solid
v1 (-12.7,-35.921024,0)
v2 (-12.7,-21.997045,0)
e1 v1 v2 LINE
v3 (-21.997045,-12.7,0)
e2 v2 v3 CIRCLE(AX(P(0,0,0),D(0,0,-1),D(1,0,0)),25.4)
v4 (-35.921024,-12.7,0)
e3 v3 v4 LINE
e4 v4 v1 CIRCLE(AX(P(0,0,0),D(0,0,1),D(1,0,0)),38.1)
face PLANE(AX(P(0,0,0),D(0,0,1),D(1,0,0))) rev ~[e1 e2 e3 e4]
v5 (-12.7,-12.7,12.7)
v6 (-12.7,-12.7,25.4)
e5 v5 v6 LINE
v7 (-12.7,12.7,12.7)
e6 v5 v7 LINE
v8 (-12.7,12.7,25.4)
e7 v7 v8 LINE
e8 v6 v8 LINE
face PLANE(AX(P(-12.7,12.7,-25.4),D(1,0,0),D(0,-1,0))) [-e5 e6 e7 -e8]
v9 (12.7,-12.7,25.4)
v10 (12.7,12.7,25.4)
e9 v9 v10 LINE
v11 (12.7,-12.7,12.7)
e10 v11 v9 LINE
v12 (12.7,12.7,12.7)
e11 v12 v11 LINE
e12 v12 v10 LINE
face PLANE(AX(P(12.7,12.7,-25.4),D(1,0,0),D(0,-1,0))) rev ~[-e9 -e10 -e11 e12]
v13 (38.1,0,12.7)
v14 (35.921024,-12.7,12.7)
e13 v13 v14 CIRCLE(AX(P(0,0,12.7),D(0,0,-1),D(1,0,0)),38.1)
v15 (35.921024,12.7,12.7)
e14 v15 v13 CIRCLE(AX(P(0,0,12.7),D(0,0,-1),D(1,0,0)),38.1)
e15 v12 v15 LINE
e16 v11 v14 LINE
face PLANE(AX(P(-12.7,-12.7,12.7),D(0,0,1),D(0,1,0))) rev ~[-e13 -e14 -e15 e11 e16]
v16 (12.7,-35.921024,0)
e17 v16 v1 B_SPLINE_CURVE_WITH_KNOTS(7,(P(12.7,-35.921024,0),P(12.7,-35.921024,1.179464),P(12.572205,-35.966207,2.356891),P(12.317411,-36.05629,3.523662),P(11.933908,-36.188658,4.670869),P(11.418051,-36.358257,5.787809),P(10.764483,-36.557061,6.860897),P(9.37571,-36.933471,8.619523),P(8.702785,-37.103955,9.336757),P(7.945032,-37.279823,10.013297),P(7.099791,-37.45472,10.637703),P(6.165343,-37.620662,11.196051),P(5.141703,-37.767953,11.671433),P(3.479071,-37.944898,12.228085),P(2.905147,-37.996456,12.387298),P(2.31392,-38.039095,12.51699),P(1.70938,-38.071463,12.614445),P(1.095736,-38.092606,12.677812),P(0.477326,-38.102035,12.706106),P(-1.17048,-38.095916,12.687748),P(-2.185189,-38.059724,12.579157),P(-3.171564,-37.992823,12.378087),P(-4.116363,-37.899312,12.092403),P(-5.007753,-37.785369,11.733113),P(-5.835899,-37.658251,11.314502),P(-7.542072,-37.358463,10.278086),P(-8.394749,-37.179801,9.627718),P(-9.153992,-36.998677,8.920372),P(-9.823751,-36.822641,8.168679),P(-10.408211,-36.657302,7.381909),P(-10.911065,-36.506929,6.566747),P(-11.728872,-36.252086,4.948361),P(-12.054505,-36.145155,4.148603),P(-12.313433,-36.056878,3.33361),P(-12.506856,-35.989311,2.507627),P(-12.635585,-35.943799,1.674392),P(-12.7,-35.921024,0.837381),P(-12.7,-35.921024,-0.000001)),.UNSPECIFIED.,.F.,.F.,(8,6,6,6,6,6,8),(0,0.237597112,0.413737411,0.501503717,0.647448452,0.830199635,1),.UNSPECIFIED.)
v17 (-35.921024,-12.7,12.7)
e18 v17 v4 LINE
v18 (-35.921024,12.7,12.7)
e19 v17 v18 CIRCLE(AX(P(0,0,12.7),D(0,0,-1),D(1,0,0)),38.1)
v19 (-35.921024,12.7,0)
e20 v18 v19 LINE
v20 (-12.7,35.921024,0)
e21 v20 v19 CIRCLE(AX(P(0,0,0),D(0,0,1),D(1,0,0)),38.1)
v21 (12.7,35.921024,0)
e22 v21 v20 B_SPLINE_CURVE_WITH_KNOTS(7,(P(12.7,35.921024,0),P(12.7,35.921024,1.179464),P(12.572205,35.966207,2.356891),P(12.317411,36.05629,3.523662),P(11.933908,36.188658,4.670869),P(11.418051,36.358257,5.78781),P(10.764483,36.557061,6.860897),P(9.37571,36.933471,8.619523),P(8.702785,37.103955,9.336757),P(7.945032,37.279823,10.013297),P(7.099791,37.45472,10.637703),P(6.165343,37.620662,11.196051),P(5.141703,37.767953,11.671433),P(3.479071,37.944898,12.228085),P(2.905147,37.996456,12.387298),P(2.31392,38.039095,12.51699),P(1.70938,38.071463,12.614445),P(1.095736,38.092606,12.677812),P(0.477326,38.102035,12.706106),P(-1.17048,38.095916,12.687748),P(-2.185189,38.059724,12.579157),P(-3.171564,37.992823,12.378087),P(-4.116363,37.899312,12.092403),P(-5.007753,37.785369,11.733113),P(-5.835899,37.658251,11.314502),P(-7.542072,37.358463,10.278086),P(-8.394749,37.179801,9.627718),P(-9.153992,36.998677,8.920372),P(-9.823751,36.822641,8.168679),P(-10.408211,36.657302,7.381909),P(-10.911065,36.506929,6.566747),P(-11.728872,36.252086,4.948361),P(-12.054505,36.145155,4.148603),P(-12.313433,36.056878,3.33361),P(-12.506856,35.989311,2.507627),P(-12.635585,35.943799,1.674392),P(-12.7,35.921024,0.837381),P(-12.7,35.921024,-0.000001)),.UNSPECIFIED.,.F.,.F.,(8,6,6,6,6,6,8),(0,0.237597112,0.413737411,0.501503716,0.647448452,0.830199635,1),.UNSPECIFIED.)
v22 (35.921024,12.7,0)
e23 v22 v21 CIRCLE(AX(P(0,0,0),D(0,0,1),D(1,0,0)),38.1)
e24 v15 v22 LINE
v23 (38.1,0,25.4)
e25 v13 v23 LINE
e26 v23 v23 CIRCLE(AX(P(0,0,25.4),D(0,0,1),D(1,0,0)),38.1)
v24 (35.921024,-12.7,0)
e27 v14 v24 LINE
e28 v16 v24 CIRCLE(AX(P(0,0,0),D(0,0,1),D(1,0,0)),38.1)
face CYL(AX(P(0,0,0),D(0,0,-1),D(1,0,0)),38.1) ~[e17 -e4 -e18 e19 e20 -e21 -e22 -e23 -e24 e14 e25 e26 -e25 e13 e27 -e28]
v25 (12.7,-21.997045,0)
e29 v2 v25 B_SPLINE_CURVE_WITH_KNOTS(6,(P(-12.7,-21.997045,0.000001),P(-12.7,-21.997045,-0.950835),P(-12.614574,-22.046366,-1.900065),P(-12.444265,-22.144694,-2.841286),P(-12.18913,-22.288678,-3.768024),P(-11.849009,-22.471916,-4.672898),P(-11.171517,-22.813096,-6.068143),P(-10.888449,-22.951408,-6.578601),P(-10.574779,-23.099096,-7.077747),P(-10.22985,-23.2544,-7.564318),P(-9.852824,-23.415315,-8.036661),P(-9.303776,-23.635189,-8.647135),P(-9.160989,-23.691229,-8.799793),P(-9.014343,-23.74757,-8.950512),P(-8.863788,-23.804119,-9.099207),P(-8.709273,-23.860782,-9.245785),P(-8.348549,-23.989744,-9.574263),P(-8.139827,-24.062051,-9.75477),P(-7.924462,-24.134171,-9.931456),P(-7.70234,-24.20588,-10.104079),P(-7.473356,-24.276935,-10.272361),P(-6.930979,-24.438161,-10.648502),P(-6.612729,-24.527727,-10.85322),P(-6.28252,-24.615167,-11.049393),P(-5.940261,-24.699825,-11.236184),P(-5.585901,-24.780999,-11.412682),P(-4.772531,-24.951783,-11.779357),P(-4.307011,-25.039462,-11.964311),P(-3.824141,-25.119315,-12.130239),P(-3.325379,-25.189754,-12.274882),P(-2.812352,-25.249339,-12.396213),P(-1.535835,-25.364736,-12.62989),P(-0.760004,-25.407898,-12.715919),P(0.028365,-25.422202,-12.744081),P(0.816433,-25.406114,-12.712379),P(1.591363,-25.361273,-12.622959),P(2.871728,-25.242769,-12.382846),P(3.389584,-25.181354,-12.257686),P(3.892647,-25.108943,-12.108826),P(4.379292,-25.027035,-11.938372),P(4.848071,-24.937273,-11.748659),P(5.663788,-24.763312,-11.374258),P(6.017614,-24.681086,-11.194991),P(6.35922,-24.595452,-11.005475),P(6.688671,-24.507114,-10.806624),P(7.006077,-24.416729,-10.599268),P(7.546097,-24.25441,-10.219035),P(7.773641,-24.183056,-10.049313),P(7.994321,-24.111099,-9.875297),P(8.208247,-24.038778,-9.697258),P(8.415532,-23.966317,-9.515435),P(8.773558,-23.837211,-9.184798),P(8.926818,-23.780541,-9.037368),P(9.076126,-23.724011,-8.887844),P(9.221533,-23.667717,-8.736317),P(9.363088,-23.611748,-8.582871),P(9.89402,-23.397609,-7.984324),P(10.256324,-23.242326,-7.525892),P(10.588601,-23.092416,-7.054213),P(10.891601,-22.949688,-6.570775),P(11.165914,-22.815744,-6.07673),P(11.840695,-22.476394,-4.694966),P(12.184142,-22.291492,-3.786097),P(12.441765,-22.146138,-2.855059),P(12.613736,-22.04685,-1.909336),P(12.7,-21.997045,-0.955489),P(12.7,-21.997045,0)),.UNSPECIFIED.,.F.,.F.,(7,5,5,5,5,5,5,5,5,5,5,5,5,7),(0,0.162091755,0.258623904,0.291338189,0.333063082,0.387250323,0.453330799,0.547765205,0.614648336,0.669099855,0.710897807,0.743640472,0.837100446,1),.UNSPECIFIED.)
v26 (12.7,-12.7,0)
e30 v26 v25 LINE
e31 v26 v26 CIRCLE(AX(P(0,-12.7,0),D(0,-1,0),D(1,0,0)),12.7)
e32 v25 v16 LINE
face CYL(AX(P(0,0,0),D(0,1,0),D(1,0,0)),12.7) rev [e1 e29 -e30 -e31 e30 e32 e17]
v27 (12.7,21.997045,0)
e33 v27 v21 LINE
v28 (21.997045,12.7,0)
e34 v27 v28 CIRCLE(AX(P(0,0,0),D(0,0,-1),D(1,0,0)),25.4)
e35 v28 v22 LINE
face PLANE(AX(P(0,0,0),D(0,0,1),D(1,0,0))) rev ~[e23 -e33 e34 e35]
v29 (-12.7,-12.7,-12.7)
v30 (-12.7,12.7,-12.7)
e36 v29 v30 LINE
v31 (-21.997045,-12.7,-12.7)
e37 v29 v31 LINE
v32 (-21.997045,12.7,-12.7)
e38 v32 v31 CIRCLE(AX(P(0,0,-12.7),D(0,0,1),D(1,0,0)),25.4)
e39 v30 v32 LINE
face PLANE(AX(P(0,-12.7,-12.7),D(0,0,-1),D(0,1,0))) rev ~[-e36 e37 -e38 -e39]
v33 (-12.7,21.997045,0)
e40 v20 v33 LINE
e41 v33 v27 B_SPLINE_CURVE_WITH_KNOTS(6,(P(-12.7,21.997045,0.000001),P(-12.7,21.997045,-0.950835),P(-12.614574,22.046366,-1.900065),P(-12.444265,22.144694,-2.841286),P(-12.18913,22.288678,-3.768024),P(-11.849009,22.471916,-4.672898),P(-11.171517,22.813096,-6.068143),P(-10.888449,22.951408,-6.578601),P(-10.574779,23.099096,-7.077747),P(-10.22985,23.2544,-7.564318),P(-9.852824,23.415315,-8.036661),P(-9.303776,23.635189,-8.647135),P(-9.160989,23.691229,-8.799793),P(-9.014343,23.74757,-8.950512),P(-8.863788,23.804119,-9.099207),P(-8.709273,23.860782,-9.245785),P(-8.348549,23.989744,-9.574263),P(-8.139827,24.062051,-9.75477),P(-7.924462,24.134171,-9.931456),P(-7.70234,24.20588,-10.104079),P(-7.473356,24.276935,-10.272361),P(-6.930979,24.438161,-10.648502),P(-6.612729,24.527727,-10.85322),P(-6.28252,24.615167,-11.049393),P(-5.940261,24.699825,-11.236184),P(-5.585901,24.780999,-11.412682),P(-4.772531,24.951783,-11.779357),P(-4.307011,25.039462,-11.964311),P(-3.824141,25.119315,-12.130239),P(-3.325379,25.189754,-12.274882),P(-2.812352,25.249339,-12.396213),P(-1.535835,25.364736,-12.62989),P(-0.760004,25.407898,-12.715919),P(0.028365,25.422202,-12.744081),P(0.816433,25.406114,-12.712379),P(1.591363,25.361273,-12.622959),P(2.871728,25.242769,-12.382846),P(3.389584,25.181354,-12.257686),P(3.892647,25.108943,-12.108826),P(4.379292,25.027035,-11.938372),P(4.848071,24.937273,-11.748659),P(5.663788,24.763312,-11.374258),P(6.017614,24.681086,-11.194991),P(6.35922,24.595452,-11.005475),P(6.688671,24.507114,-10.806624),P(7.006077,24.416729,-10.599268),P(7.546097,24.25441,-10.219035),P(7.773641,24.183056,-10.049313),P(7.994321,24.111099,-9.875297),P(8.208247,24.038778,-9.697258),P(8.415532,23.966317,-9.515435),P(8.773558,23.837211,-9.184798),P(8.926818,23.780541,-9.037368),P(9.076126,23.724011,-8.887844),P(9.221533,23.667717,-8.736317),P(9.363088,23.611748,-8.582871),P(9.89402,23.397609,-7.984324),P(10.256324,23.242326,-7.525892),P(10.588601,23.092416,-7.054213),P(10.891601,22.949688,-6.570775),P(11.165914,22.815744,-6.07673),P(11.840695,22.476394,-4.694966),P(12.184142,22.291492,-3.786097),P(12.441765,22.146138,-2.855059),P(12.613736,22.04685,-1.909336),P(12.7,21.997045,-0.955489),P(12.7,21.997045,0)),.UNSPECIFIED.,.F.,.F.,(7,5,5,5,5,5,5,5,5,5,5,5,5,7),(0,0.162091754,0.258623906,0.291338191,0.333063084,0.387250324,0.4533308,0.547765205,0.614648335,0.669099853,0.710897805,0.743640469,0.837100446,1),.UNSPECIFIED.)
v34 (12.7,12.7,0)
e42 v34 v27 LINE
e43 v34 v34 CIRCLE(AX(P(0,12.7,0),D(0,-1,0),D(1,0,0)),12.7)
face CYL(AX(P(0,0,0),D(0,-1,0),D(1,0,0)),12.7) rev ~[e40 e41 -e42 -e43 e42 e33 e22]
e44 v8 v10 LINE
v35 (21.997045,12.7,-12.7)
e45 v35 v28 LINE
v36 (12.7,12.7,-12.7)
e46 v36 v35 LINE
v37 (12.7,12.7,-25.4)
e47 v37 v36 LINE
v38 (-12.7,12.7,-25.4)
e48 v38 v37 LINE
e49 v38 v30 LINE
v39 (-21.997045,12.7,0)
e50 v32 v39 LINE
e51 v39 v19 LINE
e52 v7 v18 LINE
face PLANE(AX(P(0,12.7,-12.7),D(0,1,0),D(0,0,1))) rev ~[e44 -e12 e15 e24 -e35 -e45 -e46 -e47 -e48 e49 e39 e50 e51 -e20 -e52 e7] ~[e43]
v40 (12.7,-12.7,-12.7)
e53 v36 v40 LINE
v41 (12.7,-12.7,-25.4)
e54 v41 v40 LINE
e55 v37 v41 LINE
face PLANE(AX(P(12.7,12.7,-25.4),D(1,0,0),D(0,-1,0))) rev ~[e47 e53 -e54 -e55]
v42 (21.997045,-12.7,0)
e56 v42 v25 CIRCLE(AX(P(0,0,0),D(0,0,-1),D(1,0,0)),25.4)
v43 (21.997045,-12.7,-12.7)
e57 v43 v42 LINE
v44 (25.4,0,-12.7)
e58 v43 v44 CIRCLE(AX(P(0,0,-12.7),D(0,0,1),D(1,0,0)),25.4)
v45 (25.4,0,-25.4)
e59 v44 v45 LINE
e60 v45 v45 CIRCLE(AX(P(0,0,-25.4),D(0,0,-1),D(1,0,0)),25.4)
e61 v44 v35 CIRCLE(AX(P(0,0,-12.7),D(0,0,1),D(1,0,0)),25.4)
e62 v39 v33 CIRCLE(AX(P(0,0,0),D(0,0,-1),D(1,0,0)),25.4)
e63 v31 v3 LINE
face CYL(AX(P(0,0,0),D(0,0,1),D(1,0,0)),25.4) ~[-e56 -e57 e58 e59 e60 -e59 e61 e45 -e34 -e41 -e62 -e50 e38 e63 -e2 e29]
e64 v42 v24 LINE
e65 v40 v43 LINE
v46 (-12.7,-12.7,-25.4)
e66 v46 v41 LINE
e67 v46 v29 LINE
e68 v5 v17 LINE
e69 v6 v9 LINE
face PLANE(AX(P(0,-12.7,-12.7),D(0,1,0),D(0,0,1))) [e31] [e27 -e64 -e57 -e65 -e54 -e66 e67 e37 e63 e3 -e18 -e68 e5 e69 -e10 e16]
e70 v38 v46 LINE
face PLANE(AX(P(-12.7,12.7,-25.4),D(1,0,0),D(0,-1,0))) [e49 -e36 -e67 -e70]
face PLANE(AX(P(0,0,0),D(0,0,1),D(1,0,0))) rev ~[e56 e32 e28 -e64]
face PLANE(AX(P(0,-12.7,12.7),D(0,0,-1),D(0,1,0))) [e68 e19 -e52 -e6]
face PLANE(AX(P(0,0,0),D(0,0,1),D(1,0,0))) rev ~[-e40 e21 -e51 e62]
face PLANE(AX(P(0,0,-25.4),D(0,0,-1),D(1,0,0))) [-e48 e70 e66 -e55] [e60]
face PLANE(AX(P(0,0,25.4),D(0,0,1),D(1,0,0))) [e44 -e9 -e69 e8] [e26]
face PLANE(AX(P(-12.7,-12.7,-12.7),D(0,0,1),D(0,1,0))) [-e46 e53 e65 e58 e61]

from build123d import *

# Parameters (mm, degrees)
F0_R      = 38.1
F1_DEPTH  = 25.4
F2_W      = 25.4
F2_H      = 25.4
F3_DEPTH  = 25.4
F4_R      = 25.4
F5_DEPTH  = 25.4
F6_W      = 25.4
F6_H      = 25.4
F7_DEPTH  = 166
F8_W      = 25.4
F8_H      = 25.4
F9_DEPTH  = 76.201
F10_R     = 12.7
F11_DEPTH = 38.101
F12_DEPTH = 50.8
F13_W     = 25.4
F13_H     = 25.4
F14_DEPTH = 38.1010001
F15_W     = 25.4
F15_H     = 25.4
F16_DEPTH = 50.8010001


# Not quite as in the source:
# - an extrude ends at something that could not be found from the text; its depth is read off the source's solid


with BuildPart() as f1:
    # F0 (on Top) → F1 (new body)
    with BuildSketch(Plane.XY):
        Circle(F0_R)
    extrude(amount=F1_DEPTH)

    # F2 (on face) → F3 (join)
    with BuildSketch(Plane.XY.offset(25.4)):
        Rectangle(F2_W, F2_H)
    extrude(amount=F3_DEPTH)

    # F4 (on face) → F5 (join)
    with BuildSketch(Plane(origin=(0, 0, 0), x_dir=(1, 0, 0), z_dir=(0, 0, -1))):
        Circle(F4_R)
    extrude(amount=F5_DEPTH)

    # F6 (on face) → F7 (cut, through all)
    with BuildSketch(Plane(origin=(0, 0, -25.4), x_dir=(1, 0, 0), z_dir=(0, 0, -1))):
        Rectangle(F6_W, F6_H)
    extrude(amount=F7_DEPTH, mode=Mode.SUBTRACT)

    # F8 (on face) → F9 (cut, through all)
    with BuildSketch(Plane(origin=(0, 0, -25.4), x_dir=(1, 0, 0), z_dir=(0, 0, -1))):
        Rectangle(F8_W, F8_H)
    extrude(amount=-F9_DEPTH, mode=Mode.SUBTRACT)

    # F10 (on Front) → F11 (cut, through all)
    with BuildSketch(Plane.XZ):
        Circle(F10_R)
    extrude(amount=-F11_DEPTH, mode=Mode.SUBTRACT)

    # F10 (on Front) → F12 (cut)
    with BuildSketch(Plane.XZ):
        Circle(F10_R)
    extrude(amount=F12_DEPTH, mode=Mode.SUBTRACT)

    # F13 (on Right) → F14 (cut, through all)
    with BuildSketch(Plane.YZ):
        Rectangle(F13_W, F13_H)
    extrude(amount=-F14_DEPTH, mode=Mode.SUBTRACT)

    # F15 (on face) → F16 (cut, through all)
    with BuildSketch(Plane.YZ.offset(-12.7)):
        Rectangle(F15_W, F15_H)
    extrude(amount=F16_DEPTH, mode=Mode.SUBTRACT)


solid = f1.part
